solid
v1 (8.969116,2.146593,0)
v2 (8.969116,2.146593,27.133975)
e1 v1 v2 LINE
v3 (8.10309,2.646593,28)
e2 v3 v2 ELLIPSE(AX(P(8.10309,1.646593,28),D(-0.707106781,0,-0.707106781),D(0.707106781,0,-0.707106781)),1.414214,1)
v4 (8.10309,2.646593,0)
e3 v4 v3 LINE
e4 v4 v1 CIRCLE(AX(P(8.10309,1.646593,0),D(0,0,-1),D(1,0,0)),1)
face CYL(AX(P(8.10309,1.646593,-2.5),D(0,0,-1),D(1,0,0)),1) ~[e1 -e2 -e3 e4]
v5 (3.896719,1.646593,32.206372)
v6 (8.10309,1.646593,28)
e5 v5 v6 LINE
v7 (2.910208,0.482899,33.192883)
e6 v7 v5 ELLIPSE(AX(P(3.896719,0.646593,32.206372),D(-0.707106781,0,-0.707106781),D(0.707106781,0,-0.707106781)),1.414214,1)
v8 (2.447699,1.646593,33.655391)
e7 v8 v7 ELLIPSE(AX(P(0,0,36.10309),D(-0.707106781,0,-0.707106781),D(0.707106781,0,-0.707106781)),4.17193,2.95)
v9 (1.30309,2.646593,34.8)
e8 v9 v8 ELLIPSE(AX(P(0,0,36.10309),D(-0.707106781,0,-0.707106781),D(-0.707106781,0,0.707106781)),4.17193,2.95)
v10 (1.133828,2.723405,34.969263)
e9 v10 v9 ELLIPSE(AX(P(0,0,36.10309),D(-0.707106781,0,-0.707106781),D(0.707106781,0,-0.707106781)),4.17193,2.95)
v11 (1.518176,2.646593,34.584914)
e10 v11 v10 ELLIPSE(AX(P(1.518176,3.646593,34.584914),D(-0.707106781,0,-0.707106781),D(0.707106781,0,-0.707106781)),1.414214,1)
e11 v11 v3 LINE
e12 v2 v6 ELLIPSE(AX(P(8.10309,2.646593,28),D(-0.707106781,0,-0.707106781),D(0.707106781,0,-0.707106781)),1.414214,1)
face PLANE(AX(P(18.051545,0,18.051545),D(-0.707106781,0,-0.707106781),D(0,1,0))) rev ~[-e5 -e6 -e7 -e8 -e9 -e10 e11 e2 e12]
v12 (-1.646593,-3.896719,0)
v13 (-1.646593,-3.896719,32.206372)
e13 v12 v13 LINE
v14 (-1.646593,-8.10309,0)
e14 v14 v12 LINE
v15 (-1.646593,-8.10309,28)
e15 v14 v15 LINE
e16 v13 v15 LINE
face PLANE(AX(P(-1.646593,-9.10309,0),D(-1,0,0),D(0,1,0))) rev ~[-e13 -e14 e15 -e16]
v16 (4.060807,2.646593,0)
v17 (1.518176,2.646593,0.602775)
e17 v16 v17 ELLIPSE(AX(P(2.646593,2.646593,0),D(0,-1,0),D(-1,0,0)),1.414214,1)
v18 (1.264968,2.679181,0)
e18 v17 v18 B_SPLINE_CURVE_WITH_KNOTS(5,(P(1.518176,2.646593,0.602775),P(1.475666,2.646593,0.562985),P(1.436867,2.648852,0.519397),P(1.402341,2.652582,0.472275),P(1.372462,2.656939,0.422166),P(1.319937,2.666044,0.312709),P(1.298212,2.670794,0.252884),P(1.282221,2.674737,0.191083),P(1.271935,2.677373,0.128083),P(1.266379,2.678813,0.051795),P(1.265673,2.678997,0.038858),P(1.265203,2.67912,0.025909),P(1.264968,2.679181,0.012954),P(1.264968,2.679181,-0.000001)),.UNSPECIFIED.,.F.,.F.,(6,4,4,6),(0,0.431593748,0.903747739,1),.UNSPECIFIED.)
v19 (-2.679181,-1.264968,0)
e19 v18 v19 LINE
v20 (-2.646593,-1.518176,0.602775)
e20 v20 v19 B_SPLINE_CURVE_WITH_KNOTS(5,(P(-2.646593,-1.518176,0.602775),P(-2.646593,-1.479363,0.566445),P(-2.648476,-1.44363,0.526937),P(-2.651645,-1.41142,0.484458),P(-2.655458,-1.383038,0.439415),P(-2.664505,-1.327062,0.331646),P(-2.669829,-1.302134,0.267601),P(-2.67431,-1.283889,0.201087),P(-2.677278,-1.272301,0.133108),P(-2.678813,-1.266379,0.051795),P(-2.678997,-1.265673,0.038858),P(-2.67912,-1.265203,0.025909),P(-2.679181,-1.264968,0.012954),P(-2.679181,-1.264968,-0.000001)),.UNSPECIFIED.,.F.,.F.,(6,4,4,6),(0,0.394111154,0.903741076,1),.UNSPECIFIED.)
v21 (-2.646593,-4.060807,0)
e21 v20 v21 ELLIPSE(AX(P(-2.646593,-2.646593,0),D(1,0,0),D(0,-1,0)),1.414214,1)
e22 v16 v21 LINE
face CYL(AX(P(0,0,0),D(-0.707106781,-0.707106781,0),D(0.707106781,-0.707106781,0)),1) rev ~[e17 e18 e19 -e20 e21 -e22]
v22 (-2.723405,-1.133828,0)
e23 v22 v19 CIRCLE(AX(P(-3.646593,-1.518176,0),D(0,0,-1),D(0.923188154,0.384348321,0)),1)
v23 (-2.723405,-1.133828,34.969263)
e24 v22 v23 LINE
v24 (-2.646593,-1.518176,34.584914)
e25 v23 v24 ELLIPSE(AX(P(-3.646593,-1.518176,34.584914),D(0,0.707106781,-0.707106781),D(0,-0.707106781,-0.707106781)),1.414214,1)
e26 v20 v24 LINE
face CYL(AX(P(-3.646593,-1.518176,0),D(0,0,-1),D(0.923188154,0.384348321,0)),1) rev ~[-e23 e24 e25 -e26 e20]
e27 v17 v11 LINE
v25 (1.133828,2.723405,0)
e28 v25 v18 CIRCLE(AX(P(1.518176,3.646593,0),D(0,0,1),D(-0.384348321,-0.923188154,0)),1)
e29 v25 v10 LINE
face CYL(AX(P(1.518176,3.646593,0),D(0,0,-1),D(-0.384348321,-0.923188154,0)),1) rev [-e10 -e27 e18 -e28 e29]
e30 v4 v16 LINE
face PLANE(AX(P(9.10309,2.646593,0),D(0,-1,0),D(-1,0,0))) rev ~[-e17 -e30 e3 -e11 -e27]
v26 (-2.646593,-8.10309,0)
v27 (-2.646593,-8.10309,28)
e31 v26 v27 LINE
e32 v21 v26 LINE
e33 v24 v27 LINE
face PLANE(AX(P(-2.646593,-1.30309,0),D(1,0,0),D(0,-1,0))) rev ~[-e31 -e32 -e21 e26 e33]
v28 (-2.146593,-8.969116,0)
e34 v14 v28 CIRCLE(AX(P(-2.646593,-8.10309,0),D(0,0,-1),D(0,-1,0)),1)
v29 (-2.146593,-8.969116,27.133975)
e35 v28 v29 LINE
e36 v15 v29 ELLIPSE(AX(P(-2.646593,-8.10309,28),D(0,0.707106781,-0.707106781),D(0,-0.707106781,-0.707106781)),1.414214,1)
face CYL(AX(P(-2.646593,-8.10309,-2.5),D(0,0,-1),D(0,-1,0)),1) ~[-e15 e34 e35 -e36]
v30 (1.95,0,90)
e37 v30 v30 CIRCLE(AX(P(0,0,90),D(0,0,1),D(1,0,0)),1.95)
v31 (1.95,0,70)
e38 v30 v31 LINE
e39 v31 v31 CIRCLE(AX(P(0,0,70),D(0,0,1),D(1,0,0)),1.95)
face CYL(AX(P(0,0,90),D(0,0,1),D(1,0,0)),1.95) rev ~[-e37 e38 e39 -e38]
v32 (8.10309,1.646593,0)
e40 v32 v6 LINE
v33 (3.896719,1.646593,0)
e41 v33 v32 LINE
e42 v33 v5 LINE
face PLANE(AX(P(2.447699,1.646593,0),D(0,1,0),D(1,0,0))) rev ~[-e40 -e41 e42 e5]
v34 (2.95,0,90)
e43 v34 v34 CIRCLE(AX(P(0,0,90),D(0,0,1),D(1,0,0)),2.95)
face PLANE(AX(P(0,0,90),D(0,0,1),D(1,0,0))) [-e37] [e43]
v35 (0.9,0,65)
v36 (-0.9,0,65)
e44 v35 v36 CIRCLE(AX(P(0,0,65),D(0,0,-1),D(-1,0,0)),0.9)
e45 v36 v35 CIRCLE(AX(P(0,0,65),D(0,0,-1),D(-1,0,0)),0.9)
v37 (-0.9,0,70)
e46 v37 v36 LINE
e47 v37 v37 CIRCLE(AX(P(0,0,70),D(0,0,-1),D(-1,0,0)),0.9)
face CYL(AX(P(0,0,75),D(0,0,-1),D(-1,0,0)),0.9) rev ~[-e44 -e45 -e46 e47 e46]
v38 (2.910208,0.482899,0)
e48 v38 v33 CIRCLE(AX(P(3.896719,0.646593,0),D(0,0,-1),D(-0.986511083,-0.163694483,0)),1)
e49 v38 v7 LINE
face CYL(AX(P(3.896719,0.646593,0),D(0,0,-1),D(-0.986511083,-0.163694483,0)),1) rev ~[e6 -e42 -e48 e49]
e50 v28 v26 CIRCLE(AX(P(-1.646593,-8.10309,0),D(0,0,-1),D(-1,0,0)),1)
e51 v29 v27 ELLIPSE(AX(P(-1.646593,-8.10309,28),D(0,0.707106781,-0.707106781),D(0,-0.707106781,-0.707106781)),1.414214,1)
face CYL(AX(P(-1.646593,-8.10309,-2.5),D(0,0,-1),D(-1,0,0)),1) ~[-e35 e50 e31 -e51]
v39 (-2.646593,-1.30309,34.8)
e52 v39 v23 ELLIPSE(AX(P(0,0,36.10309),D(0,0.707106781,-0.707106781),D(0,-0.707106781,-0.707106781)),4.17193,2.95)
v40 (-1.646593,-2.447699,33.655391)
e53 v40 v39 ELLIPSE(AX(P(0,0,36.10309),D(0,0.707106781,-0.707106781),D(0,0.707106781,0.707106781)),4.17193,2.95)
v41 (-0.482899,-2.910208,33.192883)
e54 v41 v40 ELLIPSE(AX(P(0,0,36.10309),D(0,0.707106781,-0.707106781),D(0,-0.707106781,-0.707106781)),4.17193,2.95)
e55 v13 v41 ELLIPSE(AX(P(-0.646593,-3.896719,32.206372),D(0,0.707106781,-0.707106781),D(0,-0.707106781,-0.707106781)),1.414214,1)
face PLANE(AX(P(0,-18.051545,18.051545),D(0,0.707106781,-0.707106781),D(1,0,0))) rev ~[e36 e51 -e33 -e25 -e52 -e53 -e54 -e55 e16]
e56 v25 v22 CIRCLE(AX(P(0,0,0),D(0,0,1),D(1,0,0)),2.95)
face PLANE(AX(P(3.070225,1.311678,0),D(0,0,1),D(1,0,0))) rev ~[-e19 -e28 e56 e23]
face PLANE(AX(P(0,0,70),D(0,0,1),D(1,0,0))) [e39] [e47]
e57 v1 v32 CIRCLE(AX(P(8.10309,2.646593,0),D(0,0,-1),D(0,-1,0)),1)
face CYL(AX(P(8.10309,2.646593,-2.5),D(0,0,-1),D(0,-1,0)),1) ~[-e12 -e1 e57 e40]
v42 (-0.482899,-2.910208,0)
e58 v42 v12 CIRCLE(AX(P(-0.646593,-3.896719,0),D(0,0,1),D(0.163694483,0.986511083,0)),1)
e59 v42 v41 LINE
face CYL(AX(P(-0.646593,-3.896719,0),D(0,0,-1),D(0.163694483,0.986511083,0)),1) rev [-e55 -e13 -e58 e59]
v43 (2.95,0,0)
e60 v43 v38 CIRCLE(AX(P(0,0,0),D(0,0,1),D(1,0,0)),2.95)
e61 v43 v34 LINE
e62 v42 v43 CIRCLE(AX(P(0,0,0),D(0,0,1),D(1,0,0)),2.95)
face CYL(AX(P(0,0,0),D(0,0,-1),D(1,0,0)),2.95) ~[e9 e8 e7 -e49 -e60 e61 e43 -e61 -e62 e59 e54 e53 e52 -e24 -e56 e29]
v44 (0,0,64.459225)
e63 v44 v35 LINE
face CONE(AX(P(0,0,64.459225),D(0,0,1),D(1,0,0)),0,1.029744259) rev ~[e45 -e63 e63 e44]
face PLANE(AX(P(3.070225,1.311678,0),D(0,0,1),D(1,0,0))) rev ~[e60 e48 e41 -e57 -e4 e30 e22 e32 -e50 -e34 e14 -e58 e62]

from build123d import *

# Parameters (mm, degrees)
F0_R         = 2.95
F1_DEPTH     = 95
F3_DEPTH     = 35
F4_T4_DEPTH  = 1
F4_S5_R      = 2.95
F4_T6_DEPTH  = 8
F4_T10_DEPTH = 1
F4_S11_R     = 2.95
F4_T12_DEPTH = 8
F5_T4_DEPTH  = 37.2779404698
F5_T9_DEPTH  = 35.3377138687
F5_T14_DEPTH = 35.3377138687
F5_T19_DEPTH = 37.2779404698
F5_T21_DEPTH = 32
F9_R         = 1
F10_DEPTH    = 12.5
F11_DEPTH    = 5
F12_R        = 1.95
F13_DEPTH    = 20
F15_D        = 1.8
F15_DEPTH    = 5
F15_TIP      = 0.5407745571


# Not quite as in the source:
# - a fillet or chamfer that OpenCascade refuses, or shapes differently, is made with other operations: its cross-section is extruded or revolved along the edge and cut away or added


with BuildPart() as f1:
    # F0 (on Top) → F1 (new body)
    with BuildSketch(Plane.XY):
        Circle(F0_R)
    extrude(amount=F1_DEPTH)

    # F2 (on Top) → F3 (join)
    with BuildSketch(Plane.XY):
        Polygon((1.3030903237, 2.6465932079), (2.4476990844, 1.6465932079), (9.1030903237, 1.6465932079), (9.1030903237, 2.6465932079), align=None)
        Polygon((-2.6465932079, -9.1030903237), (-1.6465932079, -9.1030903237), (-1.6465932079, -2.4476990844), (-2.6465932079, -1.3030903237), align=None)
    extrude(amount=F3_DEPTH)

    # F4: chamfer of 8 on 2 edges, made by hand


with BuildPart() as f4_tool2:
    # F4_s3 → F4_t4 (new body)
    with BuildSketch(Plane.XZ.offset(-1.6465932079)):
        with BuildLine():
            Line((0.8768161537, 35.22627417), (9.3293644937, 26.77372583))
            Line((9.3293644937, 26.77372583), (9.4893644937, 26.77372583))
            ThreePointArc((9.4893644937, 26.77372583), (9.2630903237, 30.886862915), (9.2630903237, 35))
            Line((9.2630903237, 35), (9.1030903237, 35.16))
            ThreePointArc((9.1030903237, 35.16), (4.9899532387, 35.16), (0.8768161537, 35.38627417))
            Line((0.8768161537, 35.38627417), (0.8768161537, 35.22627417))
        make_face()
    extrude(amount=-F4_T4_DEPTH)

    # F4_s5 → F4_t6 (cut, symmetric)
    with BuildSketch(Plane.XY.offset(31.1)):
        Circle(F4_S5_R)
    extrude(amount=F4_T6_DEPTH, both=True, mode=Mode.SUBTRACT)


with BuildPart() as f1_1:
    add(f1.part)

    # F4_t1: cut F4_tool2
    add(f4_tool2.part, mode=Mode.SUBTRACT)


with BuildPart() as f4_tool8:
    # F4_s9 → F4_t10 (new body)
    with BuildSketch(Plane.YZ.offset(-2.6465932079)):
        with BuildLine():
            Line((-0.8768161537, 35.22627417), (-9.3293644937, 26.77372583))
            Line((-9.3293644937, 26.77372583), (-9.4893644937, 26.77372583))
            ThreePointArc((-9.4893644937, 26.77372583), (-9.2630903237, 30.886862915), (-9.2630903237, 35))
            Line((-9.2630903237, 35), (-9.1030903237, 35.16))
            ThreePointArc((-9.1030903237, 35.16), (-4.9899532387, 35.16), (-0.8768161537, 35.38627417))
            Line((-0.8768161537, 35.38627417), (-0.8768161537, 35.22627417))
        make_face()
    extrude(amount=F4_T10_DEPTH)

    # F4_s11 → F4_t12 (cut, symmetric)
    with BuildSketch(Plane.XY.offset(31.1)):
        Circle(F4_S11_R)
    extrude(amount=F4_T12_DEPTH, both=True, mode=Mode.SUBTRACT)


with BuildPart() as f1_2:
    add(f1_1.part)

    # F4_t7: cut F4_tool8
    add(f4_tool8.part, mode=Mode.SUBTRACT)

    # F5: fillet of radius 1 on 8 edges, made by hand


with BuildPart() as f5_tool2:
    # F5_s3 → F5_t4 (new body)
    with BuildSketch(Plane.XY):
        with BuildLine():
            ThreePointArc((-0.4828987249, -2.9102076939), (-1.2932405295, -3.1339296566), (-1.6465932079, -3.8967187765))
            Line((-1.6465932079, -3.8967187765), (-1.6465932079, -2.4476990844))
            ThreePointArc((-1.6465932079, -2.4476990844), (-1.0895698814, -2.7414115841), (-0.4828987249, -2.9102076939))
        make_face()
    extrude(amount=F5_T4_DEPTH)

    split(bisect_by=Plane(origin=(0, -18.0515451619, 18.0515451618), x_dir=(1, 0, 0), z_dir=(0, 0.7071067812, -0.7071067812)), keep=Keep.TOP)


with BuildPart() as f1_3:
    add(f1_2.part)

    # F5_t1: union F5_tool2
    add(f5_tool2.part)


with BuildPart() as f5_tool7:
    # F5_s8 → F5_t9 (new body)
    with BuildSketch(Plane.XY):
        with BuildLine():
            ThreePointArc((-2.723405054, -1.1338275494), (-2.6659841743, -1.3222015794), (-2.6465932079, -1.5181758712))
            Line((-2.6465932079, -1.5181758712), (-2.6465932079, -1.3030903237))
            ThreePointArc((-2.6465932079, -1.3030903237), (-2.6863325939, -1.2190640651), (-2.723405054, -1.1338275494))
        make_face()
    extrude(amount=F5_T9_DEPTH)

    split(bisect_by=Plane(origin=(0, -18.0515451619, 18.0515451618), x_dir=(1, 0, 0), z_dir=(0, 0.7071067812, -0.7071067812)), keep=Keep.TOP)


with BuildPart() as f1_4:
    add(f1_3.part)

    # F5_t6: union F5_tool7
    add(f5_tool7.part)


with BuildPart() as f5_tool12:
    # F5_s13 → F5_t14 (new body)
    with BuildSketch(Plane.XY):
        with BuildLine():
            ThreePointArc((1.1338275494, 2.723405054), (1.3222015794, 2.6659841743), (1.5181758712, 2.6465932079))
            Line((1.5181758712, 2.6465932079), (1.3030903237, 2.6465932079))
            ThreePointArc((1.3030903237, 2.6465932079), (1.2190640651, 2.6863325939), (1.1338275494, 2.723405054))
        make_face()
    extrude(amount=F5_T14_DEPTH)

    split(bisect_by=Plane(origin=(18.0515451619, 0, 18.0515451618), x_dir=(0, 1, 0), z_dir=(-0.7071067812, 0, -0.7071067812)), keep=Keep.TOP)


with BuildPart() as f1_5:
    add(f1_4.part)

    # F5_t11: union F5_tool12
    add(f5_tool12.part)


with BuildPart() as f5_tool17:
    # F5_s18 → F5_t19 (new body)
    with BuildSketch(Plane.XY):
        with BuildLine():
            ThreePointArc((2.9102076939, 0.4828987249), (3.1339296566, 1.2932405295), (3.8967187765, 1.6465932079))
            Line((3.8967187765, 1.6465932079), (2.4476990844, 1.6465932079))
            ThreePointArc((2.4476990844, 1.6465932079), (2.7414115841, 1.0895698814), (2.9102076939, 0.4828987249))
        make_face()
    extrude(amount=F5_T19_DEPTH)

    split(bisect_by=Plane(origin=(18.0515451619, 0, 18.0515451618), x_dir=(0, 1, 0), z_dir=(-0.7071067812, 0, -0.7071067812)), keep=Keep.TOP)


with BuildPart() as f1_6:
    add(f1_5.part)

    # F5_t16: union F5_tool17
    add(f5_tool17.part)

    # F5_s22 → F5_t21 (cut)
    with BuildSketch(Plane.XY.offset(-2.5)):
        with BuildLine():
            ThreePointArc((8.1030903237, 1.6465932079), (8.8101971049, 1.9394864268), (9.1030903237, 2.6465932079))
            Line((9.1030903237, 2.6465932079), (9.1030903237, 1.6465932079))
            Line((9.1030903237, 1.6465932079), (8.1030903237, 1.6465932079))
        make_face()
        with BuildLine():
            ThreePointArc((9.1030903237, 1.6465932079), (8.8101971049, 2.3536999891), (8.1030903237, 2.6465932079))
            Line((8.1030903237, 2.6465932079), (9.1030903237, 2.6465932079))
            Line((9.1030903237, 2.6465932079), (9.1030903237, 1.6465932079))
        make_face()
        with BuildLine():
            ThreePointArc((-2.6465932079, -8.1030903237), (-2.3536999891, -8.8101971049), (-1.6465932079, -9.1030903237))
            Line((-1.6465932079, -9.1030903237), (-2.6465932079, -9.1030903237))
            Line((-2.6465932079, -9.1030903237), (-2.6465932079, -8.1030903237))
        make_face()
        with BuildLine():
            ThreePointArc((-2.6465932079, -9.1030903237), (-1.9394864268, -8.8101971049), (-1.6465932079, -8.1030903237))
            Line((-1.6465932079, -8.1030903237), (-1.6465932079, -9.1030903237))
            Line((-1.6465932079, -9.1030903237), (-2.6465932079, -9.1030903237))
        make_face()
    extrude(amount=F5_T21_DEPTH, mode=Mode.SUBTRACT)

    # F9 (on 3pt) → F10 (cut, symmetric)
    with BuildSketch(Plane(origin=(0, 0, 0), x_dir=(0.7071067812, -0.7071067812, 0), z_dir=(-0.7071067812, -0.7071067812, 0))):
        Circle(F9_R)
    extrude(amount=F10_DEPTH, both=True, mode=Mode.SUBTRACT)

    # F11 (cut): a face of the model
    f11_faces = [f1_6.faces().sort_by_distance(p)[0] for p in [
        (0, 0, 95),
    ]]
    extrude(f11_faces, amount=-F11_DEPTH, mode=Mode.SUBTRACT)

    # F12 (on face) → F13 (cut)
    with BuildSketch(Plane.XY.offset(90)):
        Circle(F12_R)
    extrude(amount=-F13_DEPTH, mode=Mode.SUBTRACT)

    # F15
    with Locations(Plane.XY.offset(70)):
        with Locations((0, 0)):
            Hole(F15_D / 2, depth=F15_DEPTH)
            with Locations((0, 0, -(F15_DEPTH + F15_TIP / 2))):  # 118° drill point
                Cone(0, F15_D / 2, F15_TIP, mode=Mode.SUBTRACT)


solid = f1_6.part
